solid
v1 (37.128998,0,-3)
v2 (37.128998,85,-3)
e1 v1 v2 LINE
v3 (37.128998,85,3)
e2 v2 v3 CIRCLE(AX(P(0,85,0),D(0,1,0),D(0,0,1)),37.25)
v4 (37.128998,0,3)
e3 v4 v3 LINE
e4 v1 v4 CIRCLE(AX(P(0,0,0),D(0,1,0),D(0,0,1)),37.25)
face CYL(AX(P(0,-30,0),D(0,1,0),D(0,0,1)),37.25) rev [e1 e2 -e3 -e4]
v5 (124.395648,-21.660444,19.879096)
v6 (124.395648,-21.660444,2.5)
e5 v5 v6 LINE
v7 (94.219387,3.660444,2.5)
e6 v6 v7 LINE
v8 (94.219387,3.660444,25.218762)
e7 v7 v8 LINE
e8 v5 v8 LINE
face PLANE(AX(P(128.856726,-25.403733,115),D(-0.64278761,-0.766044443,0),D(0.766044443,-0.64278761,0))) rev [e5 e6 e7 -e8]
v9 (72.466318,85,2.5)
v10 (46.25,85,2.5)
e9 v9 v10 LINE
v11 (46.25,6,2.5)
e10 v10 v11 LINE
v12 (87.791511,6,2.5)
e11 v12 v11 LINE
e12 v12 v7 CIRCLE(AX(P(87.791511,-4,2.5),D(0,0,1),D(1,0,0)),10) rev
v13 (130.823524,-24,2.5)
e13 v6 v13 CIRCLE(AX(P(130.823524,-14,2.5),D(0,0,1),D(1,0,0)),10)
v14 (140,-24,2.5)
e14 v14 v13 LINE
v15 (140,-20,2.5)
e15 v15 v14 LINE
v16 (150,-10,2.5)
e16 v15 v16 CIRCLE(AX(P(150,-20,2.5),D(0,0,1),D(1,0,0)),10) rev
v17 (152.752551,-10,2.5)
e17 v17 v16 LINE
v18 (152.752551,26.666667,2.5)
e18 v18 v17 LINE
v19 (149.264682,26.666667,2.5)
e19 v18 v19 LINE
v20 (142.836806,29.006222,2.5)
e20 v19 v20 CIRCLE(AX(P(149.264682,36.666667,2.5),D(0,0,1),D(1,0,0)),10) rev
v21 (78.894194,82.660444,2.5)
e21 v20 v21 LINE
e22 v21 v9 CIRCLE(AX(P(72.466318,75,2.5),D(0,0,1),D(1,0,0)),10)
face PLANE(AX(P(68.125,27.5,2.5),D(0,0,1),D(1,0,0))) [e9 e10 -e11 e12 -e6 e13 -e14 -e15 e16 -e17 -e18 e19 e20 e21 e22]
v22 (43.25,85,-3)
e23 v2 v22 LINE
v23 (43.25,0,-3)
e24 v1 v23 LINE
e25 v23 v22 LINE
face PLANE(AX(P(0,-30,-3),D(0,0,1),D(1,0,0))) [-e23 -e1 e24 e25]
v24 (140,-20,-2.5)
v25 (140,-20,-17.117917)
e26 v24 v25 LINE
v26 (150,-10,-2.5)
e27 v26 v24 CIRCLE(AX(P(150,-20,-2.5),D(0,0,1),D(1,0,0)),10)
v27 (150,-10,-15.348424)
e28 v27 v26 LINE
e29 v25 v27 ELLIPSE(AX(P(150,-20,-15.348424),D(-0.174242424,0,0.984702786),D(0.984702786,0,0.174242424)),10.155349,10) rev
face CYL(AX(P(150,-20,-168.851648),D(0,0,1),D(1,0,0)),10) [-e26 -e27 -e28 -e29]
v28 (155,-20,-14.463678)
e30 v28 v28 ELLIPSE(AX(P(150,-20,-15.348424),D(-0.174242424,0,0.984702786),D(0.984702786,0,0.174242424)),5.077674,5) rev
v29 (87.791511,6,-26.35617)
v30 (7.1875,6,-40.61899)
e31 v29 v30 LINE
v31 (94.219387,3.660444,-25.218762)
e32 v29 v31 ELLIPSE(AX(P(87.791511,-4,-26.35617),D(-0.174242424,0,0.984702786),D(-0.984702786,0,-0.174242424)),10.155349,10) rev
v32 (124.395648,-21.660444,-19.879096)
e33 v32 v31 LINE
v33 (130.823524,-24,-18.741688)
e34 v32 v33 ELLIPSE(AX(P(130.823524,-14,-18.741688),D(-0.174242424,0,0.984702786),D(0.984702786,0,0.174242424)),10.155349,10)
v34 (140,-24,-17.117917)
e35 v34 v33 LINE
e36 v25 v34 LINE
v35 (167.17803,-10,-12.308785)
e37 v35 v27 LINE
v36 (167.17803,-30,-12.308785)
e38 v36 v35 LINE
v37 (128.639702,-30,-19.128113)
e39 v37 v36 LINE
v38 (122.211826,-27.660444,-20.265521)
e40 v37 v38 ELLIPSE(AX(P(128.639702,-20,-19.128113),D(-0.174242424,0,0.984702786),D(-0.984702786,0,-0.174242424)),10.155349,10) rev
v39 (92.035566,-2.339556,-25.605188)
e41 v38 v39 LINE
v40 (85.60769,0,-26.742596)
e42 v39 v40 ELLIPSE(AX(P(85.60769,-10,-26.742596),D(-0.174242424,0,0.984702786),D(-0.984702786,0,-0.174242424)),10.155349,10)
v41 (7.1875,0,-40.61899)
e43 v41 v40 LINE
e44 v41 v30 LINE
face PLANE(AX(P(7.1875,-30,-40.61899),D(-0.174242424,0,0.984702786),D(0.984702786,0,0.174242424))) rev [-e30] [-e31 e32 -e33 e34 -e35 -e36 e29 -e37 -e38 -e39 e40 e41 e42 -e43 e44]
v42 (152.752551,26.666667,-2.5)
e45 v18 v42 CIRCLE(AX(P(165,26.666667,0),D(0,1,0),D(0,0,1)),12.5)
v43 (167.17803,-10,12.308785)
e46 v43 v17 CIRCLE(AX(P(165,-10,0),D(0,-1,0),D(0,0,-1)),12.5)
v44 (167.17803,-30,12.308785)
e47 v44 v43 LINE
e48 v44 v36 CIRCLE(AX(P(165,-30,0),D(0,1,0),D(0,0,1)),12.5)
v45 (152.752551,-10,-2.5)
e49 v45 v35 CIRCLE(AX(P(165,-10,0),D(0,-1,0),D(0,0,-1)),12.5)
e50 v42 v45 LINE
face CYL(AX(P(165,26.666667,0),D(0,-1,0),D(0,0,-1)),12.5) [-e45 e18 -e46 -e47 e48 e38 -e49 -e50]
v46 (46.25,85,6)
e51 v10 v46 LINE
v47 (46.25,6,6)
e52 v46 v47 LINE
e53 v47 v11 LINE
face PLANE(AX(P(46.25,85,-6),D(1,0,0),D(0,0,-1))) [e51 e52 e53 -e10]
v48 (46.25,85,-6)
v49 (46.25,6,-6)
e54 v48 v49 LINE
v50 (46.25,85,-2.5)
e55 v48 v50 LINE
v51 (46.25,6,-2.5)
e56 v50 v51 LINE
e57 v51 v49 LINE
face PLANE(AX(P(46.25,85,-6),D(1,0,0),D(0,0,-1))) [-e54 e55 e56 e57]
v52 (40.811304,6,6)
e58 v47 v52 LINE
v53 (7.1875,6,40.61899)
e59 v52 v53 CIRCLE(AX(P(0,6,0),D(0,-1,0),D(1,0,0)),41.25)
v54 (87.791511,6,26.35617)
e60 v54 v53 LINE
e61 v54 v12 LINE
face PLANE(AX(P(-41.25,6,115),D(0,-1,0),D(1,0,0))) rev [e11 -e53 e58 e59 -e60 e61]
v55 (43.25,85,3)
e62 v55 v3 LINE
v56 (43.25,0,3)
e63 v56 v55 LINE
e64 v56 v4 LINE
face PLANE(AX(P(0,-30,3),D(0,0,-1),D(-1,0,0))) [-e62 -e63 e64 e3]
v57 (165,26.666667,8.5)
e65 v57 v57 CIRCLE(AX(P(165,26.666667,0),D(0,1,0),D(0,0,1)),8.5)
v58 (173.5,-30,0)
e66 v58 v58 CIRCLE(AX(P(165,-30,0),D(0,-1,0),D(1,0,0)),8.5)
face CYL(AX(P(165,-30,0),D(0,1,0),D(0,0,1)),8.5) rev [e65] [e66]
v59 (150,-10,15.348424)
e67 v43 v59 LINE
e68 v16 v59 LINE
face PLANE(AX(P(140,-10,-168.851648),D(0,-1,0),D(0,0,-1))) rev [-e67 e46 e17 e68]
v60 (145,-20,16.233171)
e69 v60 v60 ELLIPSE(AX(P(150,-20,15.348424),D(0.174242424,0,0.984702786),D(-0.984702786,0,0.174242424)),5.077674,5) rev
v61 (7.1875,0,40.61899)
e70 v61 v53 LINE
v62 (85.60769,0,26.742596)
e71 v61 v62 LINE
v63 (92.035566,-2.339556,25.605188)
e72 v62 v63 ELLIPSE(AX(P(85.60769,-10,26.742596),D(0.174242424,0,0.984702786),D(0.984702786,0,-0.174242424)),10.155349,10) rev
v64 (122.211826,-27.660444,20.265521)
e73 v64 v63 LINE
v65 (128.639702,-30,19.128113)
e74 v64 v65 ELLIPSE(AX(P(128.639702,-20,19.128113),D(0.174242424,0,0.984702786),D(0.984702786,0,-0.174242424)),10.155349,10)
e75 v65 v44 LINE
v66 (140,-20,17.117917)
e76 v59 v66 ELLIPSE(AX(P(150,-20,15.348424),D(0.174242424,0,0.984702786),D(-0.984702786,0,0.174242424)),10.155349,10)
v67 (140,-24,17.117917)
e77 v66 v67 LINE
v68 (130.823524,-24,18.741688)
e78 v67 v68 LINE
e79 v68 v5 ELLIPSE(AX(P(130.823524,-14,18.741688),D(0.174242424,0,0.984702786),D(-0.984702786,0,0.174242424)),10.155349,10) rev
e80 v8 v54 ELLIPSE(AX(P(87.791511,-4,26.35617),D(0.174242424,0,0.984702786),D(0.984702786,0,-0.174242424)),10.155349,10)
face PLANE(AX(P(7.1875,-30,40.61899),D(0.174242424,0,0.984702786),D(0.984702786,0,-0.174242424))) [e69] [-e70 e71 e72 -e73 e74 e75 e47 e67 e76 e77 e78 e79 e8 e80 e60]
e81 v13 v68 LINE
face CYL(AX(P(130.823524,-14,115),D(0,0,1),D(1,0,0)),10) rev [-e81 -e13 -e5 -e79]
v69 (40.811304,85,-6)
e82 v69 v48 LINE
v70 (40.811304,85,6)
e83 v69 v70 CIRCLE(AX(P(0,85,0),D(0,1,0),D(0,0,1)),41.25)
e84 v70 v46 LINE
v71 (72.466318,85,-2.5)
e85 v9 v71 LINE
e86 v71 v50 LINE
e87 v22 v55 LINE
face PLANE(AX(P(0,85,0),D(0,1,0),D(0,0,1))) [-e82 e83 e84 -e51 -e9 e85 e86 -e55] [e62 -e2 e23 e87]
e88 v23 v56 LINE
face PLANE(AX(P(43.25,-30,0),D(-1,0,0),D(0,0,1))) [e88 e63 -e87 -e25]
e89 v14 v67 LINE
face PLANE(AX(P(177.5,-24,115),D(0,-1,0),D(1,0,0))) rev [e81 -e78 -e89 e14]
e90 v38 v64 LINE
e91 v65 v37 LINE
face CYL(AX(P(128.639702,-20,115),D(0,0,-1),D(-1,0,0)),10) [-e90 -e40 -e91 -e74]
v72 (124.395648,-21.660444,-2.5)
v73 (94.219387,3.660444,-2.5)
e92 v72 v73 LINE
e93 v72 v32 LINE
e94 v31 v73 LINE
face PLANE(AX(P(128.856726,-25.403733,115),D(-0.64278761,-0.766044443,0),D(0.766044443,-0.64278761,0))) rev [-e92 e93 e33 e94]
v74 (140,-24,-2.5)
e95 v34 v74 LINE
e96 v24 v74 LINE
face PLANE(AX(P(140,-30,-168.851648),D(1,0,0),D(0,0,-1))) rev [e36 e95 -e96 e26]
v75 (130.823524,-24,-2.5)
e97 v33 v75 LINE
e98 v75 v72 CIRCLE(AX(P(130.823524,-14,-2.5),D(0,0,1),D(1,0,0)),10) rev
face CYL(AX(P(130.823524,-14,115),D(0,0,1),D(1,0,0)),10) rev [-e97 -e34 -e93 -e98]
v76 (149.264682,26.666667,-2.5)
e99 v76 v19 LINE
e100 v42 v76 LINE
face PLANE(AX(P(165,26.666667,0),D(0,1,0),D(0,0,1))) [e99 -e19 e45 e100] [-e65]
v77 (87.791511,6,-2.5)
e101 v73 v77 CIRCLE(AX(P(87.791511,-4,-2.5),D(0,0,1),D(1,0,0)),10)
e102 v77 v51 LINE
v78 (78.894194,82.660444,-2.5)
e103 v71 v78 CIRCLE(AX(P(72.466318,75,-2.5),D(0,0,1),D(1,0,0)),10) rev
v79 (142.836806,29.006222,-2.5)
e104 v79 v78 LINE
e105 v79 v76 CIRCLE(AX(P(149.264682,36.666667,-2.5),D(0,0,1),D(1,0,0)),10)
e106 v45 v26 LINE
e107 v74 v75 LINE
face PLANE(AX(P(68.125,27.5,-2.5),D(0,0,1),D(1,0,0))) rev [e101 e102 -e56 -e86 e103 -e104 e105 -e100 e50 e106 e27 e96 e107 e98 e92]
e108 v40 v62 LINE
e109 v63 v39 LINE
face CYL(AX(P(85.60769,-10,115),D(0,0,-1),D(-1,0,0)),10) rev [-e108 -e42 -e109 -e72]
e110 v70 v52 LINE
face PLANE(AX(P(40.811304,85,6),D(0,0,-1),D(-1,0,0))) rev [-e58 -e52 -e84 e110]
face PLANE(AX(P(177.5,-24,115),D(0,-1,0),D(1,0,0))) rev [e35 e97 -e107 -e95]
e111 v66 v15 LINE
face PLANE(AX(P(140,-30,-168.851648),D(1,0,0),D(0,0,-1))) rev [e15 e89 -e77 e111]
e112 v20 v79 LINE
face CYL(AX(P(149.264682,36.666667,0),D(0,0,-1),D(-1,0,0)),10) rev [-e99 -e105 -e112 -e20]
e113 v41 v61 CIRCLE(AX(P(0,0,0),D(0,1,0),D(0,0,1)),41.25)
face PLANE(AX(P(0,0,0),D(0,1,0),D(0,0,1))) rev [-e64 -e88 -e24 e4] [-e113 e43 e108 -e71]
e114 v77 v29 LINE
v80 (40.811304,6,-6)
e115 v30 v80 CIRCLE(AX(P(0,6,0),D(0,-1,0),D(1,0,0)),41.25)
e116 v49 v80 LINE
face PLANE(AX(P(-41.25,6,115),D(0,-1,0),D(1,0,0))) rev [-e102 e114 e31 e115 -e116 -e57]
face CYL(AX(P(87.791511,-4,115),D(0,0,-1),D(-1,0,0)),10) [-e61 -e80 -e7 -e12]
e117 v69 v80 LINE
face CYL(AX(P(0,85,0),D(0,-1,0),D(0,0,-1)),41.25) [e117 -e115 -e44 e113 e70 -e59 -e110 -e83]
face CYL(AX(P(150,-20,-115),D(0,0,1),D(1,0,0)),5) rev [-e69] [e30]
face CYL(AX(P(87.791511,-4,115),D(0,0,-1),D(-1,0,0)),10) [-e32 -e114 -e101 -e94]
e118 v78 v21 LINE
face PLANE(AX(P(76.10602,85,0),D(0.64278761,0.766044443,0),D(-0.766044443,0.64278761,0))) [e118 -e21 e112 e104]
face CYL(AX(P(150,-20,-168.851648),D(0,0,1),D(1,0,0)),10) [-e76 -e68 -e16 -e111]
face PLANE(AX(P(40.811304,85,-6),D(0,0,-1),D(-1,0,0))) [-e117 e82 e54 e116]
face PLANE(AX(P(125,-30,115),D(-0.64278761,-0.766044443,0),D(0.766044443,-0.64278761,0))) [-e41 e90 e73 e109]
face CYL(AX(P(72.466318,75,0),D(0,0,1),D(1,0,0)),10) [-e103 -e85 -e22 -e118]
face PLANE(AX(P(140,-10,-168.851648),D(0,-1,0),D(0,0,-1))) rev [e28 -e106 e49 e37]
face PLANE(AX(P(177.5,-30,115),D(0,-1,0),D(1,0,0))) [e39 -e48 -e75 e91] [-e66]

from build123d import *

# Parameters (mm, degrees)
BOSS_EXTRUDE1_DEPTH     = 85
BOSS_EXTRUDE2_START     = -30
SKETCH2_3_R             = 12.5
BOSS_EXTRUDE2_DEPTH     = 56.666666667
EXTRUDE_THIN1_DEPTH     = 115
SKETCH5_W               = 50
SKETCH5_H               = 20
BOSS_EXTRUDE3_DEPTH     = 230
CUT_EXTRUDE2_DEPTH      = 311.201547385
CUT_EXTRUDE2_DEPTH_BACK = 311.201547385
SKETCH5_3_R             = 5
CUT_EXTRUDE1_START      = -30
CUT_EXTRUDE1_OUTLINE_R  = 8.5
CUT_EXTRUDE1_DEPTH      = 115
RIB1_START              = -2.5
RIB1_DEPTH              = 5
FILLET1_R               = 10


# Read off the part's stored shape, not the designer's step: Cut-Extrude1, Rib1
with BuildPart() as part:
    # Sketch2 → Boss-Extrude1 (new body)
    with BuildSketch(Plane(origin=(0, 0, 0), x_dir=(1, 0, 0), z_dir=(0, 1, 0))):
        with BuildLine():
            Line((40.811303581, 6), (46.25, 6))
            Line((46.25, 6), (46.25, -6))
            Line((46.25, -6), (40.811303581, -6))
            ThreePointArc((40.811303581, -6), (-41.25, 0), (40.811303581, 6))
        make_face()
    extrude(amount=BOSS_EXTRUDE1_DEPTH)



with BuildPart() as body_2:
    # Sketch2<3> → Boss-Extrude2 (new body)
    with BuildSketch(Plane(origin=(0, 0, 0), x_dir=(1, 0, 0), z_dir=(0, 1, 0)).offset(BOSS_EXTRUDE2_START)):
        with Locations(Location((165, 0, 0), (0, 0, 270))):
            Circle(SKETCH2_3_R)
    extrude(amount=BOSS_EXTRUDE2_DEPTH)


with BuildPart() as part_1:
    add(part.part)

    add(body_2.part)  # Extrude-Thin1 merges body 2
    # Sketch3 → Extrude-Thin1 (add, symmetric)
    with BuildSketch(Plane.XY):
        Polygon((-41.25, 0), (89.247392222, 0), (125, -30), (177.5, -30), (177.5, -24), (127.183821406, -24), (91.431213628, 6), (-41.25, 6), align=None)
    extrude(amount=EXTRUDE_THIN1_DEPTH, both=True)

    # Sketch5 → Boss-Extrude3 (add)
    with BuildSketch(Plane.XY.offset(115)):
        with Locations((165, -20)):
            Rectangle(SKETCH5_W, SKETCH5_H)
    extrude(amount=-BOSS_EXTRUDE3_DEPTH)

    # Sketch5<3> → Cut-Extrude2 (cut, two sides: drawn at the far end of the back side and taken through both)
    with BuildSketch(Plane.XY.offset(115).offset(-CUT_EXTRUDE2_DEPTH_BACK)):
        with Locations((150, -20)):
            Circle(SKETCH5_3_R)
    extrude(amount=CUT_EXTRUDE2_DEPTH + CUT_EXTRUDE2_DEPTH_BACK, mode=Mode.SUBTRACT)

    # Cut-Extrude1 outline → Cut-Extrude1 (cut)
    with BuildSketch(Plane(origin=(0, 0, 0), x_dir=(1, 0, 0), z_dir=(0, 1, 0)).offset(CUT_EXTRUDE1_START)):
        with BuildLine():
            ThreePointArc((167.178030303, 12.30878483), (174.5779794, 8.03195559), (177.5, 0))
            ThreePointArc((177.5, 0), (174.5779794, -8.03195559), (167.178030303, -12.30878483))
            Line((167.178030303, -12.30878483), (140, -17.117917039))
            Line((140, -17.117917039), (140, -115))
            Line((140, -115), (190, -115))
            Line((190, -115), (190, 115))
            Line((190, 115), (140, 115))
            Line((140, 115), (140, 17.117917039))
            Line((140, 17.117917039), (167.178030303, 12.30878483))
        make_face()
        with BuildLine():
            Line((7.1875, 40.61898994), (140, 17.117917039))
            Line((140, 17.117917039), (140, 115))
            Line((140, 115), (-41.25, 115))
            Line((-41.25, 115), (-41.25, -8.8e-08))
            ThreePointArc((-41.25, -8.8e-08), (-26.505453482, 31.607331993), (7.1875, 40.61898994))
        make_face()
        with BuildLine():
            Line((140, -115), (140, -17.117917039))
            Line((140, -17.117917039), (7.1875, -40.61898994))
            ThreePointArc((7.1875, -40.61898994), (-26.505453415, -31.607332049), (-41.25, -8.8e-08))
            Line((-41.25, -8.8e-08), (-41.25, -115))
            Line((-41.25, -115), (140, -115))
        make_face()
        with Locations((165, 0)):
            Circle(CUT_EXTRUDE1_OUTLINE_R)
        with BuildLine():
            Line((43.25, 3), (37.128998101, 3))
            ThreePointArc((37.128998101, 3), (-37.25, 0), (37.128998101, -3))
            Line((37.128998101, -3), (43.25, -3))
            Line((43.25, -3), (43.25, 3))
        make_face()
    extrude(amount=CUT_EXTRUDE1_DEPTH, mode=Mode.SUBTRACT)

    # Rib1 outline → Rib1 (add)
    with BuildSketch(Plane.XY.offset(RIB1_START)):
        Polygon((145.624979942, 26.666666667), (76.106020374, 85), (46.25, 85), (46.25, 6), (91.431213628, 6), (127.183821406, -24), (140, -24), (140, -10), (154, -10), (154, 26.666666667), align=None)
    extrude(amount=RIB1_DEPTH)

    # Fillet1
    fillet1_edges = [part_1.edges().sort_by_distance(p)[0] for p in [
        (140, -10, 9.80895852),
        (127.183821406, -24, -10.942865145),
        (91.431213628, 6, -14.106063797),
        (145.624979942, 26.666666667, 0),
        (76.106020374, 85, 0),
        (140, -10, -9.808958519),
        (89.247392222, 0, 0),
        (91.431213628, 6, 14.106063797),
        (127.183821406, -24, 10.942865145),
        (125, -30, 0),
    ]]
    fillet(fillet1_edges, radius=FILLET1_R)


solid = part_1.part
